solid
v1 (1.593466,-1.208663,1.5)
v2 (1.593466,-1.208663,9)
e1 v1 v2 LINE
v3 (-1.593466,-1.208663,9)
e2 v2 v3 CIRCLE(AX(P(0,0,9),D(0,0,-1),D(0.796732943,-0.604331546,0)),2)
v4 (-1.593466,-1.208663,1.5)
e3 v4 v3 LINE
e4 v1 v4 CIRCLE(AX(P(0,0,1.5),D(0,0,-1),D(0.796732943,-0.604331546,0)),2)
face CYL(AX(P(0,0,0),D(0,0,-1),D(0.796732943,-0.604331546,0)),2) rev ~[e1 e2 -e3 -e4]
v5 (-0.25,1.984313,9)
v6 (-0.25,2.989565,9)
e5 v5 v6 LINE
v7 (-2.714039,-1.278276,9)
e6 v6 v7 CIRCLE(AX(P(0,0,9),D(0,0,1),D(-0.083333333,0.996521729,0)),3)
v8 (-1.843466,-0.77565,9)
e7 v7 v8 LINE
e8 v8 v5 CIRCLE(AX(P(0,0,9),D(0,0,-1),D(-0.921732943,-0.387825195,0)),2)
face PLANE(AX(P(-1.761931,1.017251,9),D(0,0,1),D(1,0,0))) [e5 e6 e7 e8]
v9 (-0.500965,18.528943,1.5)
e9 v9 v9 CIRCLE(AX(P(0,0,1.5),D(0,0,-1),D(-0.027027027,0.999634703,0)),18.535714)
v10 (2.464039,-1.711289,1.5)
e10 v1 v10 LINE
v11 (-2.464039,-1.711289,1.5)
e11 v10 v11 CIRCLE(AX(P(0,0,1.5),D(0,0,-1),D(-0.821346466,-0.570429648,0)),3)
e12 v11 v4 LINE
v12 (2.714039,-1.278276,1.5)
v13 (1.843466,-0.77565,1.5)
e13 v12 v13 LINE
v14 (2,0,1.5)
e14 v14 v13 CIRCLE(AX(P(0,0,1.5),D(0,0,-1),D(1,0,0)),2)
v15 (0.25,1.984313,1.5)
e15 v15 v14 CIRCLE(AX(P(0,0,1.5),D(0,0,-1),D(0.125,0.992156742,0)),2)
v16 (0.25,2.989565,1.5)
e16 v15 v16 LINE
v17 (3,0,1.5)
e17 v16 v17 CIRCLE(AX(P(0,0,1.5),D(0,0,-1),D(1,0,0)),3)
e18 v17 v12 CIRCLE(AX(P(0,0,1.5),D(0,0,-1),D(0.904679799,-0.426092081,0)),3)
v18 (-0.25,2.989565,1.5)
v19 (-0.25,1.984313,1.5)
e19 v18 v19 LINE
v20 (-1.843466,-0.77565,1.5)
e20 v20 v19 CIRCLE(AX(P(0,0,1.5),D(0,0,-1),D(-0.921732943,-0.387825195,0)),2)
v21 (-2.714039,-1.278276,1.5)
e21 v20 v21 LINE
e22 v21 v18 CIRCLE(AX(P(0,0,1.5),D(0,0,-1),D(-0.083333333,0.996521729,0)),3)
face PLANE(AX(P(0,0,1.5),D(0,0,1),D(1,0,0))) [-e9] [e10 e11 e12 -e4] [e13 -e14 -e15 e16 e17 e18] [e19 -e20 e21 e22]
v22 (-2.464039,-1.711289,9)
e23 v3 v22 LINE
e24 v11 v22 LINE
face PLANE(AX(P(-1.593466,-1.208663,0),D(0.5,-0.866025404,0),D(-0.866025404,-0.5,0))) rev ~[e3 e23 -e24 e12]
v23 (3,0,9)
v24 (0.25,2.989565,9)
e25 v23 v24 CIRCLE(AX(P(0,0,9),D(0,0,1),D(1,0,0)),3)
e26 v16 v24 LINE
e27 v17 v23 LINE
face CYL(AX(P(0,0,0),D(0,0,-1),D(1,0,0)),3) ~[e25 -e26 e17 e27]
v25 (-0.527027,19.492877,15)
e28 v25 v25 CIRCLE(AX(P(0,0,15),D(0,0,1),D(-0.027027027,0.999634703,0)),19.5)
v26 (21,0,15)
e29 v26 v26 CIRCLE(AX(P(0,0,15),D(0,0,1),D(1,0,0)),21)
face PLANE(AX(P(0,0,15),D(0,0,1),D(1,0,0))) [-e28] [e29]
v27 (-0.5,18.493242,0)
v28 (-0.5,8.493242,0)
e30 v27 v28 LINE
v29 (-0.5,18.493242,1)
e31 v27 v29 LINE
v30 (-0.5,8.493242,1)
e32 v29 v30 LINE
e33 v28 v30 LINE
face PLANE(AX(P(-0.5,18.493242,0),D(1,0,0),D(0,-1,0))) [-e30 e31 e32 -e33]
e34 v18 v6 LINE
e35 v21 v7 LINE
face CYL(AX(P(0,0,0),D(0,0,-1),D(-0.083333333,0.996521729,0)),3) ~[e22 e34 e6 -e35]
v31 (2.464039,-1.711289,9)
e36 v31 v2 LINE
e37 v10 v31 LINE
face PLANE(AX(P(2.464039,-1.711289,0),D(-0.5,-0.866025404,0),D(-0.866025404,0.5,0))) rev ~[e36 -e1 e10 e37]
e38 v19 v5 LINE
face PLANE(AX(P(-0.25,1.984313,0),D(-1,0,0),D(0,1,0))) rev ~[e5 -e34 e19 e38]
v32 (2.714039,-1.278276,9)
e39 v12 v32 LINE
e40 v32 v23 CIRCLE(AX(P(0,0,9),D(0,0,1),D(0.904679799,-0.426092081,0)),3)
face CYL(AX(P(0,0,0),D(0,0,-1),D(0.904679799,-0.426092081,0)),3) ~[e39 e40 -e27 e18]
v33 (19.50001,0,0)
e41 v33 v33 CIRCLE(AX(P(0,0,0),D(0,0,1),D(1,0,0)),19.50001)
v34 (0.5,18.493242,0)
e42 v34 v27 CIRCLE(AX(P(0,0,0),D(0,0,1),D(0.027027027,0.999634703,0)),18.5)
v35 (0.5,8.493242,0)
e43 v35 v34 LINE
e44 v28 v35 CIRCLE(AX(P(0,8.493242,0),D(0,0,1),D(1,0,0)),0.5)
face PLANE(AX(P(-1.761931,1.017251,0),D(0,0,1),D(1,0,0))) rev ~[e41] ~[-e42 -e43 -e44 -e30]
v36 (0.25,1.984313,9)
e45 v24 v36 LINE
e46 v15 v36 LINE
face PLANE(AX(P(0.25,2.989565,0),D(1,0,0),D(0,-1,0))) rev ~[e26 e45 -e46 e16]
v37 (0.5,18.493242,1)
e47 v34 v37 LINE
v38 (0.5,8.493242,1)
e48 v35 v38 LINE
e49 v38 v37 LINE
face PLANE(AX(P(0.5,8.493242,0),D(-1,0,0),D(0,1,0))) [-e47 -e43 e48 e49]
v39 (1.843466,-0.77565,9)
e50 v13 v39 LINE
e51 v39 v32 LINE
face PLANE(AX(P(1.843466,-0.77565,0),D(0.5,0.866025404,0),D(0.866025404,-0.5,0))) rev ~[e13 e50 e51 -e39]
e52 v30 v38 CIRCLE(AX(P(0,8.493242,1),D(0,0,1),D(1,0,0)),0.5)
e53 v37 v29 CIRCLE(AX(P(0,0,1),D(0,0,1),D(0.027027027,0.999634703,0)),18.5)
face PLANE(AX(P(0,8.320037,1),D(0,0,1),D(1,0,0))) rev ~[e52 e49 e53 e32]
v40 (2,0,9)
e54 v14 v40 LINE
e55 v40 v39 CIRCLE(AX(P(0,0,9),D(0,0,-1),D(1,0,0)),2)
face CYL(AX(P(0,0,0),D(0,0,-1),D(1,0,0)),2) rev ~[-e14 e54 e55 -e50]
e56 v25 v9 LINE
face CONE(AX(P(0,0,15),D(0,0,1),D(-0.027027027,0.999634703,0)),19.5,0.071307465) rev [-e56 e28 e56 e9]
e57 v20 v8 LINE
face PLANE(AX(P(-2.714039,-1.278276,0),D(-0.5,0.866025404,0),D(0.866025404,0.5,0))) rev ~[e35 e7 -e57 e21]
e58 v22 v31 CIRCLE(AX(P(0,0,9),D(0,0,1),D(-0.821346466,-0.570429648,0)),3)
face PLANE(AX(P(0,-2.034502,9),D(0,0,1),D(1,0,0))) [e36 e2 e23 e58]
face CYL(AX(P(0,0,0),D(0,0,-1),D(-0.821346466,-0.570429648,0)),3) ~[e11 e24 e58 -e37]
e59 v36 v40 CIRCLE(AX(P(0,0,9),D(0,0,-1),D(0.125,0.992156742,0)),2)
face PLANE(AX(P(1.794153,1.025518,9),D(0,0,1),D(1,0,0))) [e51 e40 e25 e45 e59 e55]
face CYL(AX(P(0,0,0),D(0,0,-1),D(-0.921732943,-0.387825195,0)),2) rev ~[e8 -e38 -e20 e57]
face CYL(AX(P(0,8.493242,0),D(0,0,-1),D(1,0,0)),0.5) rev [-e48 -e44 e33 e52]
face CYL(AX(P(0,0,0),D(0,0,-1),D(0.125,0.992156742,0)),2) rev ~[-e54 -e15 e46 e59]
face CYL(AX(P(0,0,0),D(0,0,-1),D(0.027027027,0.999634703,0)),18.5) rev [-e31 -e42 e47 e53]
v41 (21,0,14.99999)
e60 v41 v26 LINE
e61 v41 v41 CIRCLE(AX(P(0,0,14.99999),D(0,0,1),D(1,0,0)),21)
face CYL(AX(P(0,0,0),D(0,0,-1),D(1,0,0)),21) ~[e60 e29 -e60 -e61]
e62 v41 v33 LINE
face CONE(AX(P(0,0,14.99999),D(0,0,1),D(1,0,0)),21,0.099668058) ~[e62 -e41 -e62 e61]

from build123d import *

# Parameters (mm, degrees)
F0_R     = 21
F1_DEPTH = 15
F2_DEPTH = 1.5
F3_DEPTH = 1
F4_DEPTH = 9
F5_SIZE2 = 1.49999
F5_SIZE  = 14.99999


# Not quite as in the source:
# - a fillet or chamfer that OpenCascade refuses, or shapes differently, is made with other operations: its cross-section is extruded or revolved along the edge and cut away or added
# - a fillet or chamfer is up to 0.001 mm smaller than in the source, because OpenCascade refuses the exact size


with BuildPart() as f1:
    # F0 (on Top) → F1 (new body)
    with BuildSketch(Plane.XY):
        Circle(F0_R)
        with BuildLine():
            ThreePointArc((0.5, 18.4932420089), (13.2570735836, 12.9034879006), (18.5, 0))
            ThreePointArc((18.5, 0), (-12.9034879006, -13.2570735836), (-0.5, 18.4932420089))
            ThreePointArc((-0.5, 18.4932420089), (0, 18.5), (0.5, 18.4932420089))
        make_face(mode=Mode.SUBTRACT)
    extrude(amount=F1_DEPTH)

    # F0 (on Top) → F2 (join)
    with BuildSketch(Plane.XY):
        with BuildLine():
            ThreePointArc((-0.5, 18.4932420089), (-12.9034879006, -13.2570735836), (18.5, 0))
            ThreePointArc((18.5, 0), (13.2570735836, 12.9034879006), (0.5, 18.4932420089))
            Line((0.5, 18.4932420089), (0.5, 8.4932420089))
            ThreePointArc((0.5, 8.4932420089), (0, 7.9932420089), (-0.5, 8.4932420089))
            Line((-0.5, 8.4932420089), (-0.5, 18.4932420089))
        make_face()
        with BuildLine():
            ThreePointArc((0.25, 2.9895651858), (2.2079402166, 2.0310096012), (3, 0))
            ThreePointArc((3, 0), (2.9276371182, -0.6549358016), (2.7140393972, -1.2782762419))
            ThreePointArc((2.7140393972, -1.2782762419), (2.5980762114, -1.5), (2.4640393972, -1.7112889438))
            ThreePointArc((2.4640393972, -1.7112889438), (0, -3), (-2.4640393972, -1.7112889438))
            ThreePointArc((-2.4640393972, -1.7112889438), (-2.5980762114, -1.5), (-2.7140393972, -1.2782762419))
            ThreePointArc((-2.7140393972, -1.2782762419), (-2.5980762114, 1.5), (-0.25, 2.9895651858))
            ThreePointArc((-0.25, 2.9895651858), (0, 3), (0.25, 2.9895651858))
        make_face(mode=Mode.SUBTRACT)
        with BuildLine():
            ThreePointArc((2, 0), (1.5, 1.3228756555), (0.25, 1.9843134833))
            ThreePointArc((0.25, 1.9843134833), (0, 2), (-0.25, 1.9843134833))
            ThreePointArc((-0.25, 1.9843134833), (-1.7320508076, 1), (-1.8434658856, -0.7756503907))
            ThreePointArc((-1.8434658856, -0.7756503907), (-1.7320508076, -1), (-1.5934658856, -1.2086630926))
            ThreePointArc((-1.5934658856, -1.2086630926), (0, -2), (1.5934658856, -1.2086630926))
            ThreePointArc((1.5934658856, -1.2086630926), (1.7320508076, -1), (1.8434658856, -0.7756503907))
            ThreePointArc((1.8434658856, -0.7756503907), (1.9604759334, -0.3956439237), (2, 0))
        make_face()
        with BuildLine():
            Line((0.5, 8.4932420089), (0.5, 18.4932420089))
            Line((0.5, 18.4932420089), (-0.5, 18.4932420089))
            Line((-0.5, 18.4932420089), (-0.5, 8.4932420089))
            ThreePointArc((-0.5, 8.4932420089), (0, 8.9932420089), (0.5, 8.4932420089))
        make_face()
        with BuildLine():
            Line((-0.25, 1.9843134833), (-0.25, 2.9895651858))
            ThreePointArc((-0.25, 2.9895651858), (-2.5980762114, 1.5), (-2.7140393972, -1.2782762419))
            Line((-2.7140393972, -1.2782762419), (-1.8434658856, -0.7756503907))
            ThreePointArc((-1.8434658856, -0.7756503907), (-1.7320508076, 1), (-0.25, 1.9843134833))
        make_face()
        with BuildLine():
            ThreePointArc((-2.4640393972, -1.7112889438), (0, -3), (2.4640393972, -1.7112889438))
            Line((2.4640393972, -1.7112889438), (1.5934658856, -1.2086630926))
            ThreePointArc((1.5934658856, -1.2086630926), (0, -2), (-1.5934658856, -1.2086630926))
            Line((-1.5934658856, -1.2086630926), (-2.4640393972, -1.7112889438))
        make_face()
        with BuildLine():
            ThreePointArc((2.7140393972, -1.2782762419), (2.9276371182, -0.6549358016), (3, 0))
            ThreePointArc((3, 0), (2.2079402166, 2.0310096012), (0.25, 2.9895651858))
            Line((0.25, 2.9895651858), (0.25, 1.9843134833))
            ThreePointArc((0.25, 1.9843134833), (1.5, 1.3228756555), (2, 0))
            ThreePointArc((2, 0), (1.9604759334, -0.3956439237), (1.8434658856, -0.7756503907))
            Line((1.8434658856, -0.7756503907), (2.7140393972, -1.2782762419))
        make_face()
        with BuildLine():
            Line((0.25, 1.9843134833), (0.25, 2.9895651858))
            ThreePointArc((0.25, 2.9895651858), (0, 3), (-0.25, 2.9895651858))
            Line((-0.25, 2.9895651858), (-0.25, 1.9843134833))
            ThreePointArc((-0.25, 1.9843134833), (0, 2), (0.25, 1.9843134833))
        make_face()
        with BuildLine():
            ThreePointArc((2.4640393972, -1.7112889438), (2.5980762114, -1.5), (2.7140393972, -1.2782762419))
            Line((2.7140393972, -1.2782762419), (1.8434658856, -0.7756503907))
            ThreePointArc((1.8434658856, -0.7756503907), (1.7320508076, -1), (1.5934658856, -1.2086630926))
            Line((1.5934658856, -1.2086630926), (2.4640393972, -1.7112889438))
        make_face()
        with BuildLine():
            Line((-1.8434658856, -0.7756503907), (-2.7140393972, -1.2782762419))
            ThreePointArc((-2.7140393972, -1.2782762419), (-2.5980762114, -1.5), (-2.4640393972, -1.7112889438))
            Line((-2.4640393972, -1.7112889438), (-1.5934658856, -1.2086630926))
            ThreePointArc((-1.5934658856, -1.2086630926), (-1.7320508076, -1), (-1.8434658856, -0.7756503907))
        make_face()
        with BuildLine():
            ThreePointArc((-0.5, 8.4932420089), (0, 7.9932420089), (0.5, 8.4932420089))
            Line((0.5, 8.4932420089), (-0.5, 8.4932420089))
        make_face()
        with BuildLine():
            Line((-0.5, 8.4932420089), (0.5, 8.4932420089))
            ThreePointArc((0.5, 8.4932420089), (0, 8.9932420089), (-0.5, 8.4932420089))
        make_face()
        with BuildLine():
            Line((-0.5, 18.4932420089), (0.5, 18.4932420089))
            ThreePointArc((0.5, 18.4932420089), (0, 18.5), (-0.5, 18.4932420089))
        make_face()
    extrude(amount=F2_DEPTH)

    # F0 (on Top) → F3 (cut)
    with BuildSketch(Plane.XY):
        with BuildLine():
            ThreePointArc((-0.5, 8.4932420089), (0, 7.9932420089), (0.5, 8.4932420089))
            Line((0.5, 8.4932420089), (-0.5, 8.4932420089))
        make_face()
        with BuildLine():
            Line((-0.5, 8.4932420089), (0.5, 8.4932420089))
            ThreePointArc((0.5, 8.4932420089), (0, 8.9932420089), (-0.5, 8.4932420089))
        make_face()
        with BuildLine():
            Line((-0.5, 18.4932420089), (0.5, 18.4932420089))
            ThreePointArc((0.5, 18.4932420089), (0, 18.5), (-0.5, 18.4932420089))
        make_face()
        with BuildLine():
            Line((0.5, 8.4932420089), (0.5, 18.4932420089))
            Line((0.5, 18.4932420089), (-0.5, 18.4932420089))
            Line((-0.5, 18.4932420089), (-0.5, 8.4932420089))
            ThreePointArc((-0.5, 8.4932420089), (0, 8.9932420089), (0.5, 8.4932420089))
        make_face()
    extrude(amount=F3_DEPTH, mode=Mode.SUBTRACT)

    # F0 (on Top) → F4 (join)
    with BuildSketch(Plane.XY):
        with BuildLine():
            Line((-0.25, 1.9843134833), (-0.25, 2.9895651858))
            ThreePointArc((-0.25, 2.9895651858), (-2.5980762114, 1.5), (-2.7140393972, -1.2782762419))
            Line((-2.7140393972, -1.2782762419), (-1.8434658856, -0.7756503907))
            ThreePointArc((-1.8434658856, -0.7756503907), (-1.7320508076, 1), (-0.25, 1.9843134833))
        make_face()
        with BuildLine():
            ThreePointArc((2.7140393972, -1.2782762419), (2.9276371182, -0.6549358016), (3, 0))
            ThreePointArc((3, 0), (2.2079402166, 2.0310096012), (0.25, 2.9895651858))
            Line((0.25, 2.9895651858), (0.25, 1.9843134833))
            ThreePointArc((0.25, 1.9843134833), (1.5, 1.3228756555), (2, 0))
            ThreePointArc((2, 0), (1.9604759334, -0.3956439237), (1.8434658856, -0.7756503907))
            Line((1.8434658856, -0.7756503907), (2.7140393972, -1.2782762419))
        make_face()
        with BuildLine():
            ThreePointArc((-2.4640393972, -1.7112889438), (0, -3), (2.4640393972, -1.7112889438))
            Line((2.4640393972, -1.7112889438), (1.5934658856, -1.2086630926))
            ThreePointArc((1.5934658856, -1.2086630926), (0, -2), (-1.5934658856, -1.2086630926))
            Line((-1.5934658856, -1.2086630926), (-2.4640393972, -1.7112889438))
        make_face()
    extrude(amount=F4_DEPTH)

    # F5 (size 15 and 1.5 in the source; OpenCascade refuses exactly that, so slightly less here)
    f5_edges = [f1.edges().sort_by_distance(p)[0] for p in [
        (-21, 0, 0),
    ]]
    f5_side = f1.faces().sort_by_distance((-21, 0, 7.5))[0]
    chamfer(f5_edges, length=F5_SIZE, length2=F5_SIZE2, reference=f5_side)

    # F6: chamfer of 14 x 1 on 1 edges, made by hand


with BuildPart() as f6_tool2:
    # F6_s3 → F6_t4 (revolve)
    with BuildSketch(Plane(origin=(0, 0, 0), x_dir=(0, 0, 1), z_dir=(0.9996347032, 0.027027027, 0))):
        Polygon((15, -19.5), (1, -18.5), (15, -18.5), align=None)
    revolve(axis=Axis((0, 0, 15), (0, 0, 1)))

    split(bisect_by=Plane.XY.offset(1.5), keep=Keep.TOP)


with BuildPart() as f1_1:
    add(f1.part)

    # F6_t1: cut F6_tool2
    add(f6_tool2.part, mode=Mode.SUBTRACT)


solid = f1_1.part
